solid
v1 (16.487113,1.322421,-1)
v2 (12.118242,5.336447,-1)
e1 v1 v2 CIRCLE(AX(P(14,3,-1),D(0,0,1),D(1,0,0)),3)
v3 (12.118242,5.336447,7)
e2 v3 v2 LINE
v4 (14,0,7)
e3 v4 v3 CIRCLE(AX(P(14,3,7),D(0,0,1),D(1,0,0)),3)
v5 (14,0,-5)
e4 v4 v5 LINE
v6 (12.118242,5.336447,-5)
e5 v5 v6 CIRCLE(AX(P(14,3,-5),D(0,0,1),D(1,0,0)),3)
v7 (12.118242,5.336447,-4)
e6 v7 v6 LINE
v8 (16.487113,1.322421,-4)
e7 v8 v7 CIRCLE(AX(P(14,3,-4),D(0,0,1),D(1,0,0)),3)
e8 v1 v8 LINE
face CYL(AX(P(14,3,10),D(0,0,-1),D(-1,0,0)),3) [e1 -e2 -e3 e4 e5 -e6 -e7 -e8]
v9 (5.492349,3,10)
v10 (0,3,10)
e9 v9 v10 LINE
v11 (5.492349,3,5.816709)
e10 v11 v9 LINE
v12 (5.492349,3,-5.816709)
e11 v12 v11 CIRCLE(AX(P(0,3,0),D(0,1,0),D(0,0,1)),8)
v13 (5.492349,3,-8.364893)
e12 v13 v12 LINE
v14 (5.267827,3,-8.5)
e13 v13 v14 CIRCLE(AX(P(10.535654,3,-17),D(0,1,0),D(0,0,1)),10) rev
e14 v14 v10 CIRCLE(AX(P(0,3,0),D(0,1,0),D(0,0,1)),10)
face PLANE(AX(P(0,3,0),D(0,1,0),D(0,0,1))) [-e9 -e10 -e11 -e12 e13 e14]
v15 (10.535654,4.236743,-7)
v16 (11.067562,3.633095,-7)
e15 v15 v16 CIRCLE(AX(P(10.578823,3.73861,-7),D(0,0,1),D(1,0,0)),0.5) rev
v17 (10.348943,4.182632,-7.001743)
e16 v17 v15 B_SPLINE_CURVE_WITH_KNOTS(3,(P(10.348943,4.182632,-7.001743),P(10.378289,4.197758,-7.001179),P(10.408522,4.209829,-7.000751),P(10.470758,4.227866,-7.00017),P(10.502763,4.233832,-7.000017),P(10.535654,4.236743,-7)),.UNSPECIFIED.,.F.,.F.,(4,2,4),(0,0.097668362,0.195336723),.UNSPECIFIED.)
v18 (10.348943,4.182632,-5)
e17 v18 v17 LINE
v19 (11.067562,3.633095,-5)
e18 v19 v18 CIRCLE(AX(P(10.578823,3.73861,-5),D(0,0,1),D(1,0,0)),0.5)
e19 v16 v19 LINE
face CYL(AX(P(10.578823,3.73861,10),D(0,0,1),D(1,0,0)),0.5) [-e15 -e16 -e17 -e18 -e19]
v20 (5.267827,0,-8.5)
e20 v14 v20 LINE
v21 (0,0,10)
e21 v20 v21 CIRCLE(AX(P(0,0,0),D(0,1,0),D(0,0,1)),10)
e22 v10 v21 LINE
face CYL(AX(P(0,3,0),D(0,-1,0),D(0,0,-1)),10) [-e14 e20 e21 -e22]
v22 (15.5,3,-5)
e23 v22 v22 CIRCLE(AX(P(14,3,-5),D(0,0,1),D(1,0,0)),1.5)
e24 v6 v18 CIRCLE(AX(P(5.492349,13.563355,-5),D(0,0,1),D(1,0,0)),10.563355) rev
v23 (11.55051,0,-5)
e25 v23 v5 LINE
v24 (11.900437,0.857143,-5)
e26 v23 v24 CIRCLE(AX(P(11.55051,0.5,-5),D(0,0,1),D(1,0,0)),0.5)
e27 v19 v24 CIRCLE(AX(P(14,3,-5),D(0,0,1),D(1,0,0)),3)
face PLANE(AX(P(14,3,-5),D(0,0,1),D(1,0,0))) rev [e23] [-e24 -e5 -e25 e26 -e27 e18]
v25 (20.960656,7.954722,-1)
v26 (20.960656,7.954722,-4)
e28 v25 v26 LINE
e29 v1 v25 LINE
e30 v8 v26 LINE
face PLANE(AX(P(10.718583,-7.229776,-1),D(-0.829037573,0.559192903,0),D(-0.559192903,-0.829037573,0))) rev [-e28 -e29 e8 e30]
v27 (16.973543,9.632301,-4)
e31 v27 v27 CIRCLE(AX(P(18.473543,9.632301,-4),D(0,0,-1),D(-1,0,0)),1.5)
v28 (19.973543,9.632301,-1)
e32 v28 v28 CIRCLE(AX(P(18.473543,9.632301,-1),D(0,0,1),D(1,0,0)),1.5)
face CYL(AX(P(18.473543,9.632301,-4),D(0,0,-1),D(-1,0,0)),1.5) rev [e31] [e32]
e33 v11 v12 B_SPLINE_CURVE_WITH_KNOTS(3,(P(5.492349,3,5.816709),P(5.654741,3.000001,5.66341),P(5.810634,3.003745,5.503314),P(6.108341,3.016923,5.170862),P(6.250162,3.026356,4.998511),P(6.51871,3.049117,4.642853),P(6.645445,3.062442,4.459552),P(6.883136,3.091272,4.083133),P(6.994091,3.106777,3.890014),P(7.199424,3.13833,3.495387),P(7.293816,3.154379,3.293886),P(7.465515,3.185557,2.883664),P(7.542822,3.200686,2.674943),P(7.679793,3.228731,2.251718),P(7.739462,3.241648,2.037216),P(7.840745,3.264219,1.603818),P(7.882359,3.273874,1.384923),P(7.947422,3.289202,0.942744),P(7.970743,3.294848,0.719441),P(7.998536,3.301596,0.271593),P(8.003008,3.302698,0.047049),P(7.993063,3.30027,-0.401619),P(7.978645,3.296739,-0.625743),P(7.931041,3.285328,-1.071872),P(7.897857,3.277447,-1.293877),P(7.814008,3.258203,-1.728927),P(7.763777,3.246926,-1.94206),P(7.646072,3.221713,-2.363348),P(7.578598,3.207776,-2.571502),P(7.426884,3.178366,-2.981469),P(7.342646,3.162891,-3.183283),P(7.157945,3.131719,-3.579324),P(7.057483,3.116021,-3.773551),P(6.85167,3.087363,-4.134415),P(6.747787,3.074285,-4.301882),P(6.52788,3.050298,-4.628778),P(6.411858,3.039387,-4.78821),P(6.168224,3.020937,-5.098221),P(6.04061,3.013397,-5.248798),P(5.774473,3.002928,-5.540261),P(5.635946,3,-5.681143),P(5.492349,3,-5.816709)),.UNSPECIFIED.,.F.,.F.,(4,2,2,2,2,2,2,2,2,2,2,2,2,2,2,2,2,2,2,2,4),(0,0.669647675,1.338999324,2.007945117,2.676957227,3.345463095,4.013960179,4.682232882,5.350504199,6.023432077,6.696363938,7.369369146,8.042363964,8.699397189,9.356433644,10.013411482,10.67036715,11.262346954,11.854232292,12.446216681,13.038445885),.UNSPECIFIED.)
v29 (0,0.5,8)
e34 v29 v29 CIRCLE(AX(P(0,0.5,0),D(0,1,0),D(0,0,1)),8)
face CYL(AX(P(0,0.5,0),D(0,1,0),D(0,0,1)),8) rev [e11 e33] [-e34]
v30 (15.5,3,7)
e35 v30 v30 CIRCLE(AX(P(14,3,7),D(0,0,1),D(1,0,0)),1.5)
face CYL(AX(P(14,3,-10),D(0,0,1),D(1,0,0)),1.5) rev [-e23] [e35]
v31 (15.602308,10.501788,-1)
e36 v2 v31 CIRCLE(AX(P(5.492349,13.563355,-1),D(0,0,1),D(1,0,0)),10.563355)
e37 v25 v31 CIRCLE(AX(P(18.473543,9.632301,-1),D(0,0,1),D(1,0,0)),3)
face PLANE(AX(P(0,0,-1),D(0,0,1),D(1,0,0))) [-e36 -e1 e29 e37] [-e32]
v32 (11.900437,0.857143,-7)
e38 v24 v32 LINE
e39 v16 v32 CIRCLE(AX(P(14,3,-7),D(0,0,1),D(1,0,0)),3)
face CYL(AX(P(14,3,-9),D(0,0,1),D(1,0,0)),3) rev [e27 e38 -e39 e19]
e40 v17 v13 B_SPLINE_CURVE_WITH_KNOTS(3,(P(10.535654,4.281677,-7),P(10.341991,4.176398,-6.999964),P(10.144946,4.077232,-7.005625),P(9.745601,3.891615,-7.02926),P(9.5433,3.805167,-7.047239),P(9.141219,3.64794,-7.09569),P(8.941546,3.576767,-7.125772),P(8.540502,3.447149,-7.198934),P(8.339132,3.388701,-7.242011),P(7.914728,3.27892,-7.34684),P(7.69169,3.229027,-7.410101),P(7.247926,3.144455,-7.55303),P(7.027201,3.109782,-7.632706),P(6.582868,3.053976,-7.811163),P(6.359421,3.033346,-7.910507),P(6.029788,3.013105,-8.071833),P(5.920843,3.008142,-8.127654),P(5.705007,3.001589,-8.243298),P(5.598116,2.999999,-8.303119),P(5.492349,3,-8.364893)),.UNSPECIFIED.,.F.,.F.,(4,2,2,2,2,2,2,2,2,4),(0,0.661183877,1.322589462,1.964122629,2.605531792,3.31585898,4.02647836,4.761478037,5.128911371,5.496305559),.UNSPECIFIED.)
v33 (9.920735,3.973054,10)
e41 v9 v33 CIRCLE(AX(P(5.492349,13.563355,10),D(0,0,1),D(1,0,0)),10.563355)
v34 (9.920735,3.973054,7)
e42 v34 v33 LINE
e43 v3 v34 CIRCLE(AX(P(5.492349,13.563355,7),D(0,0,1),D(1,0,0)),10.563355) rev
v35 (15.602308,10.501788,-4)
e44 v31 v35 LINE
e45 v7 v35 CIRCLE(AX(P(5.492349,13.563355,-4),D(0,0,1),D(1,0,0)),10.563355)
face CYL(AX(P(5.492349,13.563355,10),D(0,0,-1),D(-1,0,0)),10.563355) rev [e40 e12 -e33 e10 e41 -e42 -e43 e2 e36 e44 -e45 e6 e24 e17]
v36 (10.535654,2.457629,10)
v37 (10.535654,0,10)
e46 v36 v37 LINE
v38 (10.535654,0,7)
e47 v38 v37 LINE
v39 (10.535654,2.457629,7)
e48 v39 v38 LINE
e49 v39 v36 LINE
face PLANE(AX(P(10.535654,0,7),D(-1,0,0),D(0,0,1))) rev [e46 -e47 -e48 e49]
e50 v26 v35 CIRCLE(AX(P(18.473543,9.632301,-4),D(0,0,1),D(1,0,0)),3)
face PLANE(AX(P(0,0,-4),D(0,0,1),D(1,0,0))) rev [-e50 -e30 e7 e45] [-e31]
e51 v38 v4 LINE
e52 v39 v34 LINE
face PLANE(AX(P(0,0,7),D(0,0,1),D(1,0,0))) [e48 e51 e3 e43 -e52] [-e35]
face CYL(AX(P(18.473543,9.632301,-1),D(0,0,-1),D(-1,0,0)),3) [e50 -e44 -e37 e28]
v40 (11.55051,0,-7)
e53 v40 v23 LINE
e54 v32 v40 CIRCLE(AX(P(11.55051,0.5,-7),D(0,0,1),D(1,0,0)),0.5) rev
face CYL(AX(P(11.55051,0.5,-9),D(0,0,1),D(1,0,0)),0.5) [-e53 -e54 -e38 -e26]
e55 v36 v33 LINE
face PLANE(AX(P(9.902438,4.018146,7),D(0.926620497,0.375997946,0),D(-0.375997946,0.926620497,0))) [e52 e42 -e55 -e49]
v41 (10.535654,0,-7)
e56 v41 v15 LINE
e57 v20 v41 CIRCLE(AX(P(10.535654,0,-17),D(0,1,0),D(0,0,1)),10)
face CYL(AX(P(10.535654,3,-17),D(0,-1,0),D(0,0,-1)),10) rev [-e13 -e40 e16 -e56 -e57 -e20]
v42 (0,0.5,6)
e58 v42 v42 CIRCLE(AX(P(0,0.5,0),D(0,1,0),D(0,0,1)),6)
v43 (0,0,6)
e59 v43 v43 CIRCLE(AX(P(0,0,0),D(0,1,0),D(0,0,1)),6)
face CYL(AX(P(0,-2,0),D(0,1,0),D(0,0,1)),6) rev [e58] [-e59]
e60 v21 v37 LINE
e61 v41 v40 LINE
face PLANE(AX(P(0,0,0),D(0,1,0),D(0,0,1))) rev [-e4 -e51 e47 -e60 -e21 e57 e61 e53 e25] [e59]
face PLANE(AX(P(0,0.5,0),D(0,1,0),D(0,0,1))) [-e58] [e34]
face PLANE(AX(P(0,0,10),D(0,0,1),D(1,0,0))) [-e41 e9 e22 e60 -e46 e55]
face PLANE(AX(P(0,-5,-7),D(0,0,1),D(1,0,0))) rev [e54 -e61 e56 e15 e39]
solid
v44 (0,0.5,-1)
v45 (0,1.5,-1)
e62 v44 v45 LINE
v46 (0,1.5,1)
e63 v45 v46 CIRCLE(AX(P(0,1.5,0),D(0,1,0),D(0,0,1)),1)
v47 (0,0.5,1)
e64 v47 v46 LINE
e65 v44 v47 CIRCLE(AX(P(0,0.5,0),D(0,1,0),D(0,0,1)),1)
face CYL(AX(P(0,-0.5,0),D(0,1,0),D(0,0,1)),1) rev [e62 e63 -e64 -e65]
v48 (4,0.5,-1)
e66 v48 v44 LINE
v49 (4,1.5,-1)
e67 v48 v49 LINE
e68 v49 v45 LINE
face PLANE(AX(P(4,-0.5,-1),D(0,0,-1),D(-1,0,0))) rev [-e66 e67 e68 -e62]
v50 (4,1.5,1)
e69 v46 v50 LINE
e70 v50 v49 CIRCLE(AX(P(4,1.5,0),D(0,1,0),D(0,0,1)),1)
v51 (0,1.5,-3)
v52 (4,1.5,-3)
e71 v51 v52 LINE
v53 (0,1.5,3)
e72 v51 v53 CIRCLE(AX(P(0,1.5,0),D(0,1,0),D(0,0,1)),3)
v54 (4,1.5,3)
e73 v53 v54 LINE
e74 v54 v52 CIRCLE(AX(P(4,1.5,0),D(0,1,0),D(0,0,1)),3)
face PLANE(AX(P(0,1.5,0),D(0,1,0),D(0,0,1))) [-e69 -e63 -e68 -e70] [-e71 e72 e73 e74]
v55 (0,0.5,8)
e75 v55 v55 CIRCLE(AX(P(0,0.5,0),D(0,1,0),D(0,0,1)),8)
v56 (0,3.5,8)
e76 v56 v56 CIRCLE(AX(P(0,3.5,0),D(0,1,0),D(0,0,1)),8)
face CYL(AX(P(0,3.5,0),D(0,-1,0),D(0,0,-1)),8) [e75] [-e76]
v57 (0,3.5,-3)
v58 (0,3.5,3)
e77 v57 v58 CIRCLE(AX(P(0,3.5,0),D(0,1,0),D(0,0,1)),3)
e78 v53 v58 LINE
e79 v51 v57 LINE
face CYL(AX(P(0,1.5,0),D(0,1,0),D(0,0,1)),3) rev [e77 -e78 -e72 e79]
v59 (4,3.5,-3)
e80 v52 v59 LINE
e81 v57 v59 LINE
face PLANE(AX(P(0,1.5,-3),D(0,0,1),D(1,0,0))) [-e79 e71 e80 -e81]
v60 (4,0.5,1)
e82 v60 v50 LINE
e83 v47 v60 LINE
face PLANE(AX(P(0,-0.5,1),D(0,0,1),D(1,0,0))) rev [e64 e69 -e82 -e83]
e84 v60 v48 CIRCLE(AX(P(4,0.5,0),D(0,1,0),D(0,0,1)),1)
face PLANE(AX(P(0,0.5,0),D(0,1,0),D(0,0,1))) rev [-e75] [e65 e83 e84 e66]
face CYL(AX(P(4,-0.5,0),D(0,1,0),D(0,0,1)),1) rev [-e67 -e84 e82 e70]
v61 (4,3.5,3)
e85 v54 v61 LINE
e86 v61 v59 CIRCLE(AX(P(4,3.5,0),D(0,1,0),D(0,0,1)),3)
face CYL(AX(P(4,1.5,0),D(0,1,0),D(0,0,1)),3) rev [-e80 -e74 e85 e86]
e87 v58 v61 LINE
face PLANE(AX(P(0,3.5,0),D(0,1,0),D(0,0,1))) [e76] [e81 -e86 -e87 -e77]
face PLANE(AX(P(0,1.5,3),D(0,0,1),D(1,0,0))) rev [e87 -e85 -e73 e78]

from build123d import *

# Parameters (mm, degrees)
SKETCH1_R           = 10
BOSS_EXTRUDE1_DEPTH = 3
BOSS_EXTRUDE2_DEPTH = 10
CUT_EXTRUDE1_DEPTH  = 8
BOSS_EXTRUDE6_START = -4
BOSS_EXTRUDE6_DEPTH = 3
FILLET1_R           = 10
SKETCH4_R           = 2.999999999999999
CUT_EXTRUDE2_DEPTH  = 2
SKETCH5_R           = 8
CUT_EXTRUDE3_DEPTH  = 2.5
SKETCH6_R           = 6
CUT_EXTRUDE4_DEPTH  = 2.5
CUT_EXTRUDE5_DEPTH  = 3
HOLE1_START         = -5
HOLE1_OUTLINE_R     = 1.5
HOLE1_DEPTH         = 12
SKETCH14_R          = 8
BOSS_EXTRUDE5_DEPTH = 3
CUT_EXTRUDE6_DEPTH  = 2
CUT_EXTRUDE7_DEPTH  = 2
FILLET5_R           = 0.5


# Read off the part's stored shape, not the designer's step: Boss-Extrude6, Hole1
with BuildPart() as part:
    # Sketch1 → Boss-Extrude1 (new body)
    with BuildSketch(Plane(origin=(0, 0, 0), x_dir=(1, 0, 0), z_dir=(0, 1, 0))):
        with Locations(Location((0, 0, 0), (0, 0, 270))):
            Circle(SKETCH1_R)
    extrude(amount=BOSS_EXTRUDE1_DEPTH)

    # Sketch2 → Boss-Extrude2 (add, symmetric)
    with BuildSketch(Plane.XY):
        with BuildLine():
            ThreePointArc((12.118241851863406, 5.336447361256301), (9.005233792596329, 3.6012213229490353), (5.492348724463198, 2.9999999999999964))
            Line((5.492348724463198, 2.999999999999999), (5.4923487244631986, 0))
            Line((5.4923487244631986, 0), (14, 0))
            ThreePointArc((14, 8.9e-16), (11.170747264402763, 2.002338254659653), (12.118241851863406, 5.336447361256301))
        make_face()
        with BuildLine():
            ThreePointArc((17, 3), (15.295130409570831, 5.706037180491961), (12.118241851863406, 5.336447361256301))
            ThreePointArc((12.118241851863406, 5.336447361256301), (11.170747264402763, 2.002338254659653), (14, 8.9e-16))
            ThreePointArc((14, 8.9e-16), (15.408414688357675, 0.3511572214232217), (16.48711271766513, 1.3224212895877674))
            ThreePointArc((16.48711271766513, 1.3224212895877674), (16.868914267889107, 2.1228848858317937), (17, 2.999999999999999))
        make_face()
        Polygon((5.492348724463198, 2.999999999999999), (5.4923487244631986, -2e-17), (0, 0), (0, 3.000000000000001), align=None)
    extrude(amount=BOSS_EXTRUDE2_DEPTH, both=True)

    # Sketch3 → Cut-Extrude1 (cut, symmetric)
    with BuildSketch(Plane(origin=(0, 3, 0), x_dir=(1, 0, 0), z_dir=(0, 1, 0))):
        with BuildLine():
            ThreePointArc((5.49234872446292, 8.356680291173674), (6.353206012799225, 7.7224849212498805), (7.141428428542965, 6.999999999999883))
            Line((7.141428428543003, 7), (20.223415730337077, 7))
            Line((20.223415730337077, 7), (20.223415730337077, 10))
            Line((20.223415730337077, 10), (5.492348724463198, 10))
            Line((5.492348724463198, 10), (5.492348724463198, 8.356680291173774))
        make_face()
        with BuildLine():
            Line((5.492348724463198, 10), (0, 10))
            ThreePointArc((6.1e-16, 10), (2.8664609790003457, 9.580365413483369), (5.49234872446292, 8.356680291173674))
            Line((5.492348724463198, 8.356680291173774), (5.492348724463198, 10))
        make_face()
    extrude(amount=CUT_EXTRUDE1_DEPTH, both=True, mode=Mode.SUBTRACT)

    # Boss-Extrude6 outline → Boss-Extrude6 (add)
    with BuildSketch(Plane.XY.offset(BOSS_EXTRUDE6_START)):
        with BuildLine():
            ThreePointArc((20.960655945, 7.95472187), (19.761477117, 12.341770325), (15.602307947, 10.501787764))
            ThreePointArc((15.602307947, 10.501787764), (14.249766943, 7.656401864), (12.118241854, 5.336447363))
            ThreePointArc((12.118241854, 5.336447363), (16.029708075, 5.209136739), (16.487112718, 1.32242129))
            Line((16.487112718, 1.32242129), (20.960655945, 7.95472187))
        make_face()
    extrude(amount=BOSS_EXTRUDE6_DEPTH)

    # Fillet1
    fillet1_edges = [part.edges().sort_by_distance(p)[0] for p in [
        (7.141428428542984, 1.5647577911253236, -6.999999999999941),
    ]]
    fillet(fillet1_edges, radius=FILLET1_R)

    # Sketch4 → Cut-Extrude2 (cut, symmetric)
    with BuildSketch(Plane.XY.offset(-7)):
        with Locations((14, 3)):
            Circle(SKETCH4_R)
    extrude(amount=CUT_EXTRUDE2_DEPTH, both=True, mode=Mode.SUBTRACT)

    # Sketch5 → Cut-Extrude3 (cut, symmetric)
    with BuildSketch(Plane(origin=(0, 3, 0), x_dir=(1, 0, 0), z_dir=(0, 1, 0))):
        with Locations(Location((0, 0, 0), (0, 0, 270))):
            Circle(SKETCH5_R)
    extrude(amount=CUT_EXTRUDE3_DEPTH, both=True, mode=Mode.SUBTRACT)

    # Sketch6 → Cut-Extrude4 (cut, symmetric)
    with BuildSketch(Plane(origin=(0, 0.49999999999999956, 0), x_dir=(1, 0, 0), z_dir=(0, 1, 0))):
        with Locations(Location((0, 0, 0), (0, 0, 270))):
            Circle(SKETCH6_R)
    extrude(amount=CUT_EXTRUDE4_DEPTH, both=True, mode=Mode.SUBTRACT)

    # Sketch7 → Cut-Extrude5 (cut)
    with BuildSketch(Plane(origin=(0, 0, 10), x_dir=(-1, 0, 0), z_dir=(0, 0, -1))):
        with BuildLine():
            Line((-14, -8.9e-16), (-10.535653752852738, 0))
            Line((-10.535653752852738, 0), (-10.535653752852738, 2.4576290293685137))
            Line((-10.535653752852737, 2.4576290293685137), (-9.920734510417693, 3.9730542612258857))
            ThreePointArc((-9.92073451041755, 3.973054261225835), (-11.061368455067633, 4.58724848237155), (-12.118241851863406, 5.3364473612562975))
            ThreePointArc((-12.118241851863406, 5.336447361256301), (-16.829252735597237, 3.9976617453403454), (-14.000000000000002, -2.22e-15))
        make_face()
    extrude(amount=CUT_EXTRUDE5_DEPTH, mode=Mode.SUBTRACT)

    # Hole1 outline → Hole1 (cut)
    with BuildSketch(Plane.XY.offset(HOLE1_START)):
        with Locations((14, 3)):
            Circle(HOLE1_OUTLINE_R)
    extrude(amount=HOLE1_DEPTH, mode=Mode.SUBTRACT)

    # Sketch13 → Ø3.0 mm Dowel Holes1 (revolve, cut)
    with BuildSketch(Plane(origin=(18.473543227765962, 9.632300580440345, -4), x_dir=(0, 1, 0), z_dir=(1, 0, 0))):
        Polygon((0, 0), (-3.43e-15, 14), (1.4999999999999967, 14), (1.4999999999999876, -1.37e-15), align=None)
    revolve(axis=Axis((18.473543227765962, 9.632300580440345, -10.34999999999999), (0, 0, 1)), mode=Mode.SUBTRACT)

    # Fillet5
    # the kernel refuses this fillet: 0.5 mm, written as the material it takes off along each edge
    with BuildSketch(Plane(origin=(14, 0, -13.123724356958832), x_dir=(-1, 0, 0), z_dir=(0, 0, 1))) as fillet5_piece_1:
        with BuildLine():
            CenterArc((2.4494897427835323, -0.5), FILLET5_R, 90, 135.584691402803)
            ThreePointArc((2.0995626366716245, -0.8571428571428326), (1.1338934190278316, -0.22253970068240747), (0, 0))
            Line((0, 0), (2.4494897427835323, 0))
        make_face()
    extrude(amount=8.123724356958832, mode=Mode.SUBTRACT)
    with BuildSketch(Plane(origin=(12.118241851863406, 5.336447361256301, -12.280688138935865), x_dir=(-0.5249896042858109, -0.8511086390066945, 0), z_dir=(0, 0, 1))) as fillet5_piece_2:
        with BuildLine():
            CenterArc((2.168111981095238, -0.471365198670144), FILLET5_R, 109.4847340766443, 129.55434819465773)
            ThreePointArc((1.9108853465691438, -0.9001244067233106), (0.9779980770614156, -0.4021790549421846), (0, 0))
            ThreePointArc((0, 0), (1.0006670681978018, -0.17180880797913198), (2.0013341363956045, 7e-17))
        make_face()
    extrude(amount=7.280688138935865, mode=Mode.SUBTRACT)


with BuildPart() as body_2:
    # Sketch14 → Boss-Extrude5 (new body)
    with BuildSketch(Plane(origin=(0, 0.49999999999999956, 0), x_dir=(1, 0, 0), z_dir=(0, 1, 0))):
        with Locations(Location((0, 0, 0), (0, 0, 270))):
            Circle(SKETCH14_R)
    extrude(amount=BOSS_EXTRUDE5_DEPTH)

    # Sketch15 → Cut-Extrude6 (cut)
    with BuildSketch(Plane(origin=(0, 3.4999999999999996, 0), x_dir=(1, 0, 0), z_dir=(0, 1, 0))):
        with BuildLine():
            Line((0, 3.000000000000001), (4, 3))
            ThreePointArc((4, 3), (7, 0), (4, -3))
            Line((4, -3), (0, -3.000000000000001))
            ThreePointArc((0, -3.000000000000001), (-3.000000000000001, 3.7e-16), (0, 3.000000000000001))
        make_face()
    extrude(amount=-CUT_EXTRUDE6_DEPTH, mode=Mode.SUBTRACT)

    # Sketch17 → Cut-Extrude7 (cut)
    with BuildSketch(Plane(origin=(0, 1.4999999999999996, 0), x_dir=(1, 0, 0), z_dir=(0, 1, 0))):
        with BuildLine():
            Line((-4.3e-16, -1.0000000000000009), (4, -1))
            ThreePointArc((4, -1), (5, 0), (4, 1))
            Line((4, 1), (0, 1.0000000000000009))
            ThreePointArc((0, 1.0000000000000009), (-1.0000000000000009, 1.2e-16), (-4.3e-16, -1.0000000000000009))
        make_face()
    extrude(amount=-CUT_EXTRUDE7_DEPTH, mode=Mode.SUBTRACT)


solid = Compound([part.part, body_2.part])
